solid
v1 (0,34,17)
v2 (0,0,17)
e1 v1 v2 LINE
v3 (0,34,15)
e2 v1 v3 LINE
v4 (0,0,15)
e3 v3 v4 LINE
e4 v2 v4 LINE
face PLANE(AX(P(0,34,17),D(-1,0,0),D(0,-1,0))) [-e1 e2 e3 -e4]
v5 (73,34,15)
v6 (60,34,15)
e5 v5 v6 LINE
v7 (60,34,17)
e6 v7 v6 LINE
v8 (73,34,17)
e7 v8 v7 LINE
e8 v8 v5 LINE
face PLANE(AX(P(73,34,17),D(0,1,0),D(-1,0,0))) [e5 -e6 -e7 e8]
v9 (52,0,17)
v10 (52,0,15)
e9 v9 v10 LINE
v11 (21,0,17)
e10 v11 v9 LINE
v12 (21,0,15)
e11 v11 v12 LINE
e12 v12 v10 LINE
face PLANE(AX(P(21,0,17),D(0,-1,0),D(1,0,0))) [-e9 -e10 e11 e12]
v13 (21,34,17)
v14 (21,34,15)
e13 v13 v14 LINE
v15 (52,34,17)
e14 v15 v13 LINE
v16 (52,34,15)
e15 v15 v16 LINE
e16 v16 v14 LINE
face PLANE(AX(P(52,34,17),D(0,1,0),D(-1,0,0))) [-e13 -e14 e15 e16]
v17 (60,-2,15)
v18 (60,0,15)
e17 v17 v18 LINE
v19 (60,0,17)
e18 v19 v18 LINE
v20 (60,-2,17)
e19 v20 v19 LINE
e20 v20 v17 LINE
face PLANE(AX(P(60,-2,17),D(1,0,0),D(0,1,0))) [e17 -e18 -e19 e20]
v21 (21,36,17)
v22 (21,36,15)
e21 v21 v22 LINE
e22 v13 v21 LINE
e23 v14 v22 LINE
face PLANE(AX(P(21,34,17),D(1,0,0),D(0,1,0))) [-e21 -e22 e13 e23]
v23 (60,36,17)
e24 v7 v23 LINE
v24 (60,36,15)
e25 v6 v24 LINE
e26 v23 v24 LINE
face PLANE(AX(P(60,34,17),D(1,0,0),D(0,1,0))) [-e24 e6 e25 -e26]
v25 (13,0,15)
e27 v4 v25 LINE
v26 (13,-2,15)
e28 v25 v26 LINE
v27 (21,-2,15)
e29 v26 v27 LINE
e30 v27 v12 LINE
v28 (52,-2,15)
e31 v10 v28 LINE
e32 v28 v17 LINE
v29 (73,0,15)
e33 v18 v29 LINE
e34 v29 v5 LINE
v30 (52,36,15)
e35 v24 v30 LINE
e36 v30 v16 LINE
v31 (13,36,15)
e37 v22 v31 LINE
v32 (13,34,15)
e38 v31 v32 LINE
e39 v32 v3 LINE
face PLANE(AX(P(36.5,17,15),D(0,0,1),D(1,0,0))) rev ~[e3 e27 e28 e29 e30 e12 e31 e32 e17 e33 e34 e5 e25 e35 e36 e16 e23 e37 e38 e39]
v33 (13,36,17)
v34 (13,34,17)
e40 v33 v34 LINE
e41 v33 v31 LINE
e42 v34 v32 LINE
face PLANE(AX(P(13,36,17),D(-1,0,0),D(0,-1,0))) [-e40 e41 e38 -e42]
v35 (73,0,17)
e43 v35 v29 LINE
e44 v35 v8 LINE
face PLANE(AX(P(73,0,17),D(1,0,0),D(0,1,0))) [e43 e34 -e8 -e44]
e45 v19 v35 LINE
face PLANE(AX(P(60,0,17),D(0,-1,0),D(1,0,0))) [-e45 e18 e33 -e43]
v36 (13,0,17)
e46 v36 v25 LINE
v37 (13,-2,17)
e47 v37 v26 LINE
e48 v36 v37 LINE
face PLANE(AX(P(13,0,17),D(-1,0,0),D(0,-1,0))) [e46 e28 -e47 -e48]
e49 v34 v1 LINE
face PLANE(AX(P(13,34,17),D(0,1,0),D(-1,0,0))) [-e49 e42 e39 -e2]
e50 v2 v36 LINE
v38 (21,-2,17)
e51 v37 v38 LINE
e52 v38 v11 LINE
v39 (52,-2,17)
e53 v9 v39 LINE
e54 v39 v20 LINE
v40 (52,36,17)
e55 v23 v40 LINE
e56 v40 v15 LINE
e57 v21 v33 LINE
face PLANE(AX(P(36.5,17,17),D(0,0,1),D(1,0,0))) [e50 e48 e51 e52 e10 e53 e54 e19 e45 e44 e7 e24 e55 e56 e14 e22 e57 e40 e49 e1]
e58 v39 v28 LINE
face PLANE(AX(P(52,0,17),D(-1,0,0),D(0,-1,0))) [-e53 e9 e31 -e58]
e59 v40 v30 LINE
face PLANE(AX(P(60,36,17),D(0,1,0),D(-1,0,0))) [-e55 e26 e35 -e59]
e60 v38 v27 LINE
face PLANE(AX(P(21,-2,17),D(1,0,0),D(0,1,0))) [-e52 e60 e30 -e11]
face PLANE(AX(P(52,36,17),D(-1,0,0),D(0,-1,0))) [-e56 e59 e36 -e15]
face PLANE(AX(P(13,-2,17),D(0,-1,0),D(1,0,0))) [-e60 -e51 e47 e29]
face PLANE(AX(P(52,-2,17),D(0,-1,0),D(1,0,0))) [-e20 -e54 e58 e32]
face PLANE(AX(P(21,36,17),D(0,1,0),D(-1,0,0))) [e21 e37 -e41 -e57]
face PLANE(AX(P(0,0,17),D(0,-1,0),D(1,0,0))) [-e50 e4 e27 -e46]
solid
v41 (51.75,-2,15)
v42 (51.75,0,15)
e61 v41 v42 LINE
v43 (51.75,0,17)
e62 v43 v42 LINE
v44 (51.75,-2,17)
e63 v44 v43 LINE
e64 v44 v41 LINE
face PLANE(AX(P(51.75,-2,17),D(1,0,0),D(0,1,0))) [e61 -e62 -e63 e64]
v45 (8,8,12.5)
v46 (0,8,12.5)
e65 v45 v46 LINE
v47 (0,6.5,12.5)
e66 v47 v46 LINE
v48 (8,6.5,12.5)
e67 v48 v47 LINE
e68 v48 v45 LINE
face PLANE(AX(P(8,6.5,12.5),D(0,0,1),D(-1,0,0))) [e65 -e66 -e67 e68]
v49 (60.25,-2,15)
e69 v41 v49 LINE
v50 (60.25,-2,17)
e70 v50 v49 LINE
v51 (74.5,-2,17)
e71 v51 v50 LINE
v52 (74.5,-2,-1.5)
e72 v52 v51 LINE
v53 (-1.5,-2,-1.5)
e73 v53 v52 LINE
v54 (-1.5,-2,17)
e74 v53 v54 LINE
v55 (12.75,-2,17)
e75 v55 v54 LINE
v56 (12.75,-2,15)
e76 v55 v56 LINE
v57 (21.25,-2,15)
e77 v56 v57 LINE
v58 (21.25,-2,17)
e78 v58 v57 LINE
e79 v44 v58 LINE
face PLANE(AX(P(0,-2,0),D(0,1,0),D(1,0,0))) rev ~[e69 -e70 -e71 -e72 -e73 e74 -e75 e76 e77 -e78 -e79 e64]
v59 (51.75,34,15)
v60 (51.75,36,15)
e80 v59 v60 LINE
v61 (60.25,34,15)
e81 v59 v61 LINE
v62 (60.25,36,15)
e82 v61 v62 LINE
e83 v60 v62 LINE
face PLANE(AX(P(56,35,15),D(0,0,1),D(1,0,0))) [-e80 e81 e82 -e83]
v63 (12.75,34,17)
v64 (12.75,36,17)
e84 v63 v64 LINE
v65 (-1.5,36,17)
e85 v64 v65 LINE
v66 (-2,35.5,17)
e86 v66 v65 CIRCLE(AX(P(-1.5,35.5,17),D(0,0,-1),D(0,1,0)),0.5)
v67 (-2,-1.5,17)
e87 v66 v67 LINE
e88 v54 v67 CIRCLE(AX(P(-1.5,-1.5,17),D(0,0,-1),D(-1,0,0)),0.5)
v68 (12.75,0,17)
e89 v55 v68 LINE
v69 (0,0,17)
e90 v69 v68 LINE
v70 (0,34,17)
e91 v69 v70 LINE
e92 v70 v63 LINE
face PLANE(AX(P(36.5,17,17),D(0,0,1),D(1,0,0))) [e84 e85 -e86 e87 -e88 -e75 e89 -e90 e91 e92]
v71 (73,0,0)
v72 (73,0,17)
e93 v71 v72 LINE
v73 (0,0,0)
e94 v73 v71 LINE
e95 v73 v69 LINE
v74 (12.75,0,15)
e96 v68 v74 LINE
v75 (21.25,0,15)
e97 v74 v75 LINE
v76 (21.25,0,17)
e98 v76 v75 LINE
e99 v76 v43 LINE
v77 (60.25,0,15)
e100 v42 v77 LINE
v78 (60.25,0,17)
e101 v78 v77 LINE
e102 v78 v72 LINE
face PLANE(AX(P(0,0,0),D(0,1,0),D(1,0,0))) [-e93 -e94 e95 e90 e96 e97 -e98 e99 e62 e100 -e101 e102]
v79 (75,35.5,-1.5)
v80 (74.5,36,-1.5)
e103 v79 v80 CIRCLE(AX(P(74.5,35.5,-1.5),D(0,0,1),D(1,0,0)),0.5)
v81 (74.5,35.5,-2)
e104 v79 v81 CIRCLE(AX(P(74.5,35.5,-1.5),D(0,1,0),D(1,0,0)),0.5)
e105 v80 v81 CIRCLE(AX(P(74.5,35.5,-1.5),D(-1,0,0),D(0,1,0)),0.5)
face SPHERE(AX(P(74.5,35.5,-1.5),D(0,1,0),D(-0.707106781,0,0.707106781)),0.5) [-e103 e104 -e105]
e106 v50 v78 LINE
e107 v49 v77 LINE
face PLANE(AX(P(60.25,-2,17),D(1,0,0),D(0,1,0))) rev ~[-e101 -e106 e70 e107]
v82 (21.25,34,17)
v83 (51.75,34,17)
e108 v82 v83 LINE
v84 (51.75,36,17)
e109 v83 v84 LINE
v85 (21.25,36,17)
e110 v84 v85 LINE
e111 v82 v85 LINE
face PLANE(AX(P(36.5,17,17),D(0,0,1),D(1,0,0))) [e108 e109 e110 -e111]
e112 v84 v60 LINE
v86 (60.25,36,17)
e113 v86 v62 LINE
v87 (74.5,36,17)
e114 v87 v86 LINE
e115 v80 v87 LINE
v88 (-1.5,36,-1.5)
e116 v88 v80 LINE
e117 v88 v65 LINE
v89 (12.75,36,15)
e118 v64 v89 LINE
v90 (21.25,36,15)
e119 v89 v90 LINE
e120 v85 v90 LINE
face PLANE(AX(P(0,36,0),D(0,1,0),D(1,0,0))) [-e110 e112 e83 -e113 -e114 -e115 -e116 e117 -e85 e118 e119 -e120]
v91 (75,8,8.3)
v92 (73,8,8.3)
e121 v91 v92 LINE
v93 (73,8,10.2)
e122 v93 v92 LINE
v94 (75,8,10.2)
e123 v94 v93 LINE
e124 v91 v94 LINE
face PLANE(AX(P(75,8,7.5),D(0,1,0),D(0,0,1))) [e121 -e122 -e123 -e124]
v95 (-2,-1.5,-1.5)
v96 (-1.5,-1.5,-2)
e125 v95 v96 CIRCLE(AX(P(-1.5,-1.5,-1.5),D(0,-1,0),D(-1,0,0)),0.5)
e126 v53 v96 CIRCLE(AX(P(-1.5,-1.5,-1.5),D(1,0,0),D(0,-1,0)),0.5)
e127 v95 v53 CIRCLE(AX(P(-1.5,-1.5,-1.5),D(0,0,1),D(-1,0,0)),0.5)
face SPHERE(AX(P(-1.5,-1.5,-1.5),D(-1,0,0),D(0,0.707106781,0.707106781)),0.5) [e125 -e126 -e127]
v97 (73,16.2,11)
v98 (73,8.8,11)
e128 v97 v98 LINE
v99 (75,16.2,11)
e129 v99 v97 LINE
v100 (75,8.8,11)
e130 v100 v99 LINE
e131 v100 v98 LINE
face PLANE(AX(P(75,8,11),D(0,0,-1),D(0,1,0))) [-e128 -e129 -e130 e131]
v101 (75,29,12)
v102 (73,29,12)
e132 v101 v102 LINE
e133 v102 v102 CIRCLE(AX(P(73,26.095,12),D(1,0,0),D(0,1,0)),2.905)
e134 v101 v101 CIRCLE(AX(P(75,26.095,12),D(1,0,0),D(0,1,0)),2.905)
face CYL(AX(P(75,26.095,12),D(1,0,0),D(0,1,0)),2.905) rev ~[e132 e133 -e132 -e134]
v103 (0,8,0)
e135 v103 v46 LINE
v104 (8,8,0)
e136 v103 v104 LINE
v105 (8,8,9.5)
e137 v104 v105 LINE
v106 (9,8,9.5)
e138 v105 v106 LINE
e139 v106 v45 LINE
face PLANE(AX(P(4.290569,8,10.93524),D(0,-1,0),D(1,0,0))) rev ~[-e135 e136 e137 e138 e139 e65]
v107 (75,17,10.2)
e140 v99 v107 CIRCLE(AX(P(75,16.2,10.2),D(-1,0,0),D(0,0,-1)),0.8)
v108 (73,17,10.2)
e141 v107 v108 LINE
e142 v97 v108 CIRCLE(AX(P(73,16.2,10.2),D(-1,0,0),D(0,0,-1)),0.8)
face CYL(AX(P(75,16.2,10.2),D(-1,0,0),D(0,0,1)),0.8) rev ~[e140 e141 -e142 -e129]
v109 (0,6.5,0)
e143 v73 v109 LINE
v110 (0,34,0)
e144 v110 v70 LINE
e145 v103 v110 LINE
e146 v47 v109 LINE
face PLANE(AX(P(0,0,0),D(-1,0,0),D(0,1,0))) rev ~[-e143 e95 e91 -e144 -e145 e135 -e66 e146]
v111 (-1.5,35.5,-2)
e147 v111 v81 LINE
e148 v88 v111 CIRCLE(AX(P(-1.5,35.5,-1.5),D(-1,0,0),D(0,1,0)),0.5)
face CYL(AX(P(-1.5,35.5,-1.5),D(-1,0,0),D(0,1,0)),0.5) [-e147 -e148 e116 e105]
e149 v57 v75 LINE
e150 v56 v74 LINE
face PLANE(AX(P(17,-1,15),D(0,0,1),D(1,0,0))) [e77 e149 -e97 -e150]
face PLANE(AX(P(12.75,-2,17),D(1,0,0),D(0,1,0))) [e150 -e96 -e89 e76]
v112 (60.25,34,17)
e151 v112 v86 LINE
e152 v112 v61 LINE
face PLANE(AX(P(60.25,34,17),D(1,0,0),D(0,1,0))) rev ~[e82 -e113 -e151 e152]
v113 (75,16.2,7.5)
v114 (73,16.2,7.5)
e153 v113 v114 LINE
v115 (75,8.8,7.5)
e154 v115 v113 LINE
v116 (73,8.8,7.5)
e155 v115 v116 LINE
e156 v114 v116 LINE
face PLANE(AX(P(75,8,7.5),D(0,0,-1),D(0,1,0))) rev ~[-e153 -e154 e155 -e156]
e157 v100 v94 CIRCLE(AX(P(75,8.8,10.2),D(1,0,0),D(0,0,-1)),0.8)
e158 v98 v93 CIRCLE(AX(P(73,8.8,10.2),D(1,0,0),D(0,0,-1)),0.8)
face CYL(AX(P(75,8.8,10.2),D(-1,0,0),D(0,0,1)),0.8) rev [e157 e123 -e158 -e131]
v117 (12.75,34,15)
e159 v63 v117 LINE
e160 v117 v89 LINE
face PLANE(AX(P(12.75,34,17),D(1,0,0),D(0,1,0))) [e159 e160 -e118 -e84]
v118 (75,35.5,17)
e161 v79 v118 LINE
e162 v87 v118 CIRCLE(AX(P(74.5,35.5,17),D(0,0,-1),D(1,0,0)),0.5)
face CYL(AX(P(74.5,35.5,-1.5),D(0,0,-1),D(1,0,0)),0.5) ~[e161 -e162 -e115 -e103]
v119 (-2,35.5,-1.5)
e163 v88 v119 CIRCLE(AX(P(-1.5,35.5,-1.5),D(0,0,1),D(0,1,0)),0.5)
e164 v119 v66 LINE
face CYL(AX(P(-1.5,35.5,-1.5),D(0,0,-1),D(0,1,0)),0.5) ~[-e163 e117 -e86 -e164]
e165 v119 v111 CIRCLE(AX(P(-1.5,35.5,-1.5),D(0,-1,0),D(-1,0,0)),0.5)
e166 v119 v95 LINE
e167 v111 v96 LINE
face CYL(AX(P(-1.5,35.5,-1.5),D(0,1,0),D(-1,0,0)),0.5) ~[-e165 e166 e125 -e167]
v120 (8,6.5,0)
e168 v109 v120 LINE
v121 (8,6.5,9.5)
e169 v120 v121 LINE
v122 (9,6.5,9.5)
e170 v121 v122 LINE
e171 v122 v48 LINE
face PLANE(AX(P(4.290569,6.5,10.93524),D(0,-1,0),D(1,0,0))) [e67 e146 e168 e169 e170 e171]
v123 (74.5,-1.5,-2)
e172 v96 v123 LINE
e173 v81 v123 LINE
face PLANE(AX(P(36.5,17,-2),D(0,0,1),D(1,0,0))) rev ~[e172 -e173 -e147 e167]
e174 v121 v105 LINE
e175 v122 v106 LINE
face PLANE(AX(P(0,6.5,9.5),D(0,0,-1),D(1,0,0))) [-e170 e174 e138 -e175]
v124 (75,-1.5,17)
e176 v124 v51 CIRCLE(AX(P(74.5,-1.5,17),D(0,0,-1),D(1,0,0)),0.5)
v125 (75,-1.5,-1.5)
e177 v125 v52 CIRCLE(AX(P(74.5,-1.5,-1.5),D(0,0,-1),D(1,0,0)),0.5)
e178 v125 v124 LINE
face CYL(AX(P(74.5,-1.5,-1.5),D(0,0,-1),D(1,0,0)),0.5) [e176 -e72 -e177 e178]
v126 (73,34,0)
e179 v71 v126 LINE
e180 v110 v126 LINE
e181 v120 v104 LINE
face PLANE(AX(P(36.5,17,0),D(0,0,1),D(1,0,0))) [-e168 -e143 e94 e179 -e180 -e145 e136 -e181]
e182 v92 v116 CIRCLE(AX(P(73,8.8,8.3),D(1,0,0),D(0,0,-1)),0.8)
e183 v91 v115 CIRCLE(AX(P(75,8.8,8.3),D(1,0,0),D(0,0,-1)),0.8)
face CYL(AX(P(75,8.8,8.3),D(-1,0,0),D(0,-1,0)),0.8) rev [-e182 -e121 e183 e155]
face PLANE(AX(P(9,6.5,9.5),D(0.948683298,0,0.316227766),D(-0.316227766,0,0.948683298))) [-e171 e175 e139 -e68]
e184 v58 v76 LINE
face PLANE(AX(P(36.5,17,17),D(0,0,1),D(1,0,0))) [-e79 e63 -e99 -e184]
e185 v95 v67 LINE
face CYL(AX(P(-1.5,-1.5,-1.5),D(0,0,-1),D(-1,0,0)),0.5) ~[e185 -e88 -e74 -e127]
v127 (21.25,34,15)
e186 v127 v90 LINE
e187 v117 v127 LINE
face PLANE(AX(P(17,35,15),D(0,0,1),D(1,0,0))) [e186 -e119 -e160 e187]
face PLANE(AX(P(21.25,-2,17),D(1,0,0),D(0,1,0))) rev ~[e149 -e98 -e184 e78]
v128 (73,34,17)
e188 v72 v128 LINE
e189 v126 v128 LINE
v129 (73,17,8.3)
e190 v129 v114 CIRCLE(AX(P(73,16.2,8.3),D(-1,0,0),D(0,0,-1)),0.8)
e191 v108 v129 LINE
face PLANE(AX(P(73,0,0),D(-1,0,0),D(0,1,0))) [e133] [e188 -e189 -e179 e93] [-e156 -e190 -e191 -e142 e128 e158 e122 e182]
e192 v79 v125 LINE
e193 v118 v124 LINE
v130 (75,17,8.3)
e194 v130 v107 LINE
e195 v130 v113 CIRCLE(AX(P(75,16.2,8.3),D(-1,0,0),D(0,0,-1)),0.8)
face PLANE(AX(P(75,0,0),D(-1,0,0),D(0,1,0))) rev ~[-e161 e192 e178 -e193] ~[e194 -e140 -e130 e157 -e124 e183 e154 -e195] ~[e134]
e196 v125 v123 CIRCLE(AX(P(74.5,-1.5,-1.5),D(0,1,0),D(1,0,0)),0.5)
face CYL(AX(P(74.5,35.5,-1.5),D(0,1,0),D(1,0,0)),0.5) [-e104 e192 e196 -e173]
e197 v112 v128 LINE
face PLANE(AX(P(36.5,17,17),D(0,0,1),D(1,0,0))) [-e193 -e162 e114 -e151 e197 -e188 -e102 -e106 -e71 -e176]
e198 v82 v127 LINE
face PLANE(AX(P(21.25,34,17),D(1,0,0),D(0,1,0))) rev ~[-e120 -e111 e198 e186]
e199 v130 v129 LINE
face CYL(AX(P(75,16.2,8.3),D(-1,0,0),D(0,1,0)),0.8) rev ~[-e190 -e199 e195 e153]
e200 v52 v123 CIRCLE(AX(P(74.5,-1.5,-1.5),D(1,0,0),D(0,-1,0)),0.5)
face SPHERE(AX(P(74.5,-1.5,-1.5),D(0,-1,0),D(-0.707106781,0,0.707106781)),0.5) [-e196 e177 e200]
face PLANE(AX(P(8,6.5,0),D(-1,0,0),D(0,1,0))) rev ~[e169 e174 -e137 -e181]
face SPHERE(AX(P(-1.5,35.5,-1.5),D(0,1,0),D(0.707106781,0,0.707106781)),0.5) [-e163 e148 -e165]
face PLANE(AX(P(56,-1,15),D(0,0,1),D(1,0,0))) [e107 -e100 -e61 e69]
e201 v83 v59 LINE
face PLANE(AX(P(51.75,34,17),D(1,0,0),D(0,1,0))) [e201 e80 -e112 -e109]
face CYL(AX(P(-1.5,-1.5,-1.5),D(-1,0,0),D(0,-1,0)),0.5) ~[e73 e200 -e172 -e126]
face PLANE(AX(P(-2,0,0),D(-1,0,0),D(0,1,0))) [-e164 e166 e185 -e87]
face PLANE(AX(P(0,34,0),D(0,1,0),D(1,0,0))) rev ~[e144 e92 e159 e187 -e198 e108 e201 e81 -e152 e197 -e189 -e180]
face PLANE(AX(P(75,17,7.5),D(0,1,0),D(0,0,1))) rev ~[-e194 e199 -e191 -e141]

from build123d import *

# Parameters (mm, degrees)
F0_W         = 73
F0_H         = 34
F1_DEPTH     = 17
F2_T         = 2
F3_W         = 9
F3_H         = 3.5
F4_DEPTH     = 25.4
F5_R         = 2.905
F6_DEPTH     = 25.4
F7_R         = 0.8
F8_T1_DEPTH  = 37
F8_T3_DEPTH  = 19.75
F8_T5_DEPTH  = 76
F8_S9_W      = 0.51
F8_S9_H      = 0.51
F8_T10_DEPTH = 0.51
F8_S15_W     = 0.51
F8_S15_H     = 0.51
F8_T16_DEPTH = 0.51
F8_S21_W     = 0.51
F8_S21_H     = 0.51
F8_T22_DEPTH = 0.51
F8_S27_W     = 0.51
F8_S27_H     = 0.51
F8_T28_DEPTH = 0.51
F9_W         = 8.5
F9_H         = 2
F10_DEPTH    = 2
F12_DEPTH    = 2
F13_W        = 8
F13_H        = 1.5
F14_DEPTH    = 9.5
F16_DEPTH    = 1.5


# Not quite as in the source:
# - a fillet or chamfer that OpenCascade refuses, or shapes differently, is made with other operations: its cross-section is extruded or revolved along the edge and cut away or added


with BuildPart() as f1:
    # F0 (on Top) → F1 (new body)
    with BuildSketch(Plane.XY):
        with Locations((36.5, 17)):
            Rectangle(F0_W, F0_H)
    extrude(amount=F1_DEPTH)

    # F2
    f2_openings = [f1.faces().sort_by_distance(p)[0] for p in [
        (36.5, 17, 17),
    ]]
    offset(amount=F2_T, openings=f2_openings, kind=Kind.INTERSECTION)

    # F3 (on face) → F4 (cut)
    with BuildSketch(Plane.YZ.offset(75)):
        with Locations((12.5, 9.25)):
            Rectangle(F3_W, F3_H)
    extrude(amount=-F4_DEPTH, mode=Mode.SUBTRACT)

    # F5 (on face) → F6 (cut)
    with BuildSketch(Plane.YZ.offset(75)):
        with Locations((26.095, 12)):
            Circle(F5_R)
    extrude(amount=-F6_DEPTH, mode=Mode.SUBTRACT)

    # F7
    f7_edges = [f1.edges().sort_by_distance(p)[0] for p in [
        (74, 8, 7.5),
        (74, 17, 11),
        (74, 17, 7.5),
        (74, 8, 11),
    ]]
    fillet(f7_edges, radius=F7_R)

    # F8: fillet of radius 0.5 on 9 edges, made by hand

    # F8_s2 → F8_t1 (cut)
    with BuildSketch(Plane.XZ.offset(-35.5)):
        with BuildLine():
            ThreePointArc((75, -1.5), (74.8535533906, -1.8535533906), (74.5, -2))
            Line((74.5, -2), (75, -2))
            Line((75, -2), (75, -1.5))
        make_face()
        with BuildLine():
            ThreePointArc((-2, -1.5), (-1.8535533906, -1.8535533906), (-1.5, -2))
            Line((-1.5, -2), (-2, -2))
            Line((-2, -2), (-2, -1.5))
        make_face()
    extrude(amount=F8_T1_DEPTH, mode=Mode.SUBTRACT)

    # F8_s4 → F8_t3 (cut)
    with BuildSketch(Plane.XY.offset(-1.5)):
        with BuildLine():
            ThreePointArc((75, -1.5), (74.8535533906, -1.8535533906), (74.5, -2))
            Line((74.5, -2), (75, -2))
            Line((75, -2), (75, -1.5))
        make_face()
        with BuildLine():
            ThreePointArc((75, 35.5), (74.8535533906, 35.8535533906), (74.5, 36))
            Line((74.5, 36), (75, 36))
            Line((75, 36), (75, 35.5))
        make_face()
        with BuildLine():
            ThreePointArc((-1.5, 36), (-1.8535533906, 35.8535533906), (-2, 35.5))
            Line((-2, 35.5), (-2, 36))
            Line((-2, 36), (-1.5, 36))
        make_face()
        with BuildLine():
            ThreePointArc((-2, -1.5), (-1.8535533906, -1.8535533906), (-1.5, -2))
            Line((-1.5, -2), (-2, -2))
            Line((-2, -2), (-2, -1.5))
        make_face()
    extrude(amount=F8_T3_DEPTH, mode=Mode.SUBTRACT)

    # F8_s6 → F8_t5 (cut)
    with BuildSketch(Plane.YZ.offset(-1.5)):
        with BuildLine():
            ThreePointArc((36, -1.5), (35.8535533906, -1.8535533906), (35.5, -2))
            Line((35.5, -2), (36, -2))
            Line((36, -2), (36, -1.5))
        make_face()
        with BuildLine():
            ThreePointArc((-2, -1.5), (-1.8535533906, -1.8535533906), (-1.5, -2))
            Line((-1.5, -2), (-2, -2))
            Line((-2, -2), (-2, -1.5))
        make_face()
    extrude(amount=F8_T5_DEPTH, mode=Mode.SUBTRACT)


with BuildPart() as f8_tool8:
    # F8_s9 → F8_t10 (new body)
    with BuildSketch(Plane.XZ.offset(1.5)):
        with Locations((74.755, -1.755)):
            Rectangle(F8_S9_W, F8_S9_H)
    extrude(amount=F8_T10_DEPTH)

    # F8_s11 → F8_t12 (revolve, cut)
    with BuildSketch(Plane(origin=(74.5, -1.5, -1.5), x_dir=(-0.7071067812, 0, 0.7071067812), z_dir=(0.7071067812, 0, 0.7071067812))):
        with BuildLine():
            ThreePointArc((0, -0.5), (0.5, 0), (0, 0.5))
            Line((0, 0.5), (0, -0.5))
        make_face()
    revolve(axis=Axis((74.5, -1.5, -1.5), (0, -1, 0)), mode=Mode.SUBTRACT)


with BuildPart() as f1_1:
    add(f1.part)

    # F8_t7: cut F8_tool8
    add(f8_tool8.part, mode=Mode.SUBTRACT)


with BuildPart() as f8_tool14:
    # F8_s15 → F8_t16 (new body)
    with BuildSketch(Plane.XZ.offset(-35.5)):
        with Locations((74.755, -1.755)):
            Rectangle(F8_S15_W, F8_S15_H)
    extrude(amount=-F8_T16_DEPTH)

    # F8_s17 → F8_t18 (revolve, cut)
    with BuildSketch(Plane(origin=(74.5, 35.5, -1.5), x_dir=(-0.7071067812, 0, 0.7071067812), z_dir=(-0.7071067812, 0, -0.7071067812))):
        with BuildLine():
            ThreePointArc((0, -0.5), (0.5, 0), (0, 0.5))
            Line((0, 0.5), (0, -0.5))
        make_face()
    revolve(axis=Axis((74.5, 35.5, -1.5), (0, 1, 0)), mode=Mode.SUBTRACT)


with BuildPart() as f1_2:
    add(f1_1.part)

    # F8_t13: cut F8_tool14
    add(f8_tool14.part, mode=Mode.SUBTRACT)


with BuildPart() as f8_tool20:
    # F8_s21 → F8_t22 (new body)
    with BuildSketch(Plane.XZ.offset(-35.5)):
        with Locations((-1.755, -1.755)):
            Rectangle(F8_S21_W, F8_S21_H)
    extrude(amount=-F8_T22_DEPTH)

    # F8_s23 → F8_t24 (revolve, cut)
    with BuildSketch(Plane(origin=(-1.5, 35.5, -1.5), x_dir=(0.7071067812, 0, 0.7071067812), z_dir=(-0.7071067812, 0, 0.7071067812))):
        with BuildLine():
            ThreePointArc((0, -0.5), (0.5, 0), (0, 0.5))
            Line((0, 0.5), (0, -0.5))
        make_face()
    revolve(axis=Axis((-1.5, 35.5, -1.5), (0, 1, 0)), mode=Mode.SUBTRACT)


with BuildPart() as f1_3:
    add(f1_2.part)

    # F8_t19: cut F8_tool20
    add(f8_tool20.part, mode=Mode.SUBTRACT)


with BuildPart() as f8_tool26:
    # F8_s27 → F8_t28 (new body)
    with BuildSketch(Plane.YZ.offset(-1.5)):
        with Locations((-1.755, -1.755)):
            Rectangle(F8_S27_W, F8_S27_H)
    extrude(amount=-F8_T28_DEPTH)

    # F8_s29 → F8_t30 (revolve, cut)
    with BuildSketch(Plane(origin=(-1.5, -1.5, -1.5), x_dir=(0, 0.7071067812, 0.7071067812), z_dir=(0, -0.7071067812, 0.7071067812))):
        with BuildLine():
            ThreePointArc((0, -0.5), (0.5, 0), (0, 0.5))
            Line((0, 0.5), (0, -0.5))
        make_face()
    revolve(axis=Axis((-1.5, -1.5, -1.5), (-1, 0, 0)), mode=Mode.SUBTRACT)


with BuildPart() as f1_4:
    add(f1_3.part)

    # F8_t25: cut F8_tool26
    add(f8_tool26.part, mode=Mode.SUBTRACT)

    # F9 (on face) → F10 (cut)
    with BuildSketch(Plane.XY.offset(17)):
        with Locations((17, 35)):
            Rectangle(F9_W, F9_H)
        with Locations((56, 35)):
            Rectangle(F9_W, F9_H)
        with Locations((56, -1)):
            Rectangle(F9_W, F9_H)
        with Locations((17, -1)):
            Rectangle(F9_W, F9_H)
    extrude(amount=-F10_DEPTH, mode=Mode.SUBTRACT)

    # F13 (on face) → F14 (join)
    with BuildSketch(Plane.XY):
        with Locations((4, 7.25)):
            Rectangle(F13_W, F13_H)
    extrude(amount=F14_DEPTH)

    # F15 (on face) → F16 (join)
    with BuildSketch(Plane.XZ.offset(-6.5)):
        Polygon((0, 12.5), (0, 9.5), (9, 9.5), (8, 12.5), align=None)
    extrude(amount=-F16_DEPTH)


with BuildPart() as f12:
    # F11 (on face) → F12 (new body)
    with BuildSketch(Plane.XY.offset(17)):
        Polygon((0, 34), (0, 0), (13, 0), (13, -2), (21, -2), (21, 0), (52, 0), (52, -2), (60, -2), (60, 0), (73, 0), (73, 34), (60, 34), (60, 36), (52, 36), (52, 34), (21, 34), (21, 36), (13, 36), (13, 34), align=None)
    extrude(amount=-F12_DEPTH)


solid = Compound([f1_4.part, f12.part])
